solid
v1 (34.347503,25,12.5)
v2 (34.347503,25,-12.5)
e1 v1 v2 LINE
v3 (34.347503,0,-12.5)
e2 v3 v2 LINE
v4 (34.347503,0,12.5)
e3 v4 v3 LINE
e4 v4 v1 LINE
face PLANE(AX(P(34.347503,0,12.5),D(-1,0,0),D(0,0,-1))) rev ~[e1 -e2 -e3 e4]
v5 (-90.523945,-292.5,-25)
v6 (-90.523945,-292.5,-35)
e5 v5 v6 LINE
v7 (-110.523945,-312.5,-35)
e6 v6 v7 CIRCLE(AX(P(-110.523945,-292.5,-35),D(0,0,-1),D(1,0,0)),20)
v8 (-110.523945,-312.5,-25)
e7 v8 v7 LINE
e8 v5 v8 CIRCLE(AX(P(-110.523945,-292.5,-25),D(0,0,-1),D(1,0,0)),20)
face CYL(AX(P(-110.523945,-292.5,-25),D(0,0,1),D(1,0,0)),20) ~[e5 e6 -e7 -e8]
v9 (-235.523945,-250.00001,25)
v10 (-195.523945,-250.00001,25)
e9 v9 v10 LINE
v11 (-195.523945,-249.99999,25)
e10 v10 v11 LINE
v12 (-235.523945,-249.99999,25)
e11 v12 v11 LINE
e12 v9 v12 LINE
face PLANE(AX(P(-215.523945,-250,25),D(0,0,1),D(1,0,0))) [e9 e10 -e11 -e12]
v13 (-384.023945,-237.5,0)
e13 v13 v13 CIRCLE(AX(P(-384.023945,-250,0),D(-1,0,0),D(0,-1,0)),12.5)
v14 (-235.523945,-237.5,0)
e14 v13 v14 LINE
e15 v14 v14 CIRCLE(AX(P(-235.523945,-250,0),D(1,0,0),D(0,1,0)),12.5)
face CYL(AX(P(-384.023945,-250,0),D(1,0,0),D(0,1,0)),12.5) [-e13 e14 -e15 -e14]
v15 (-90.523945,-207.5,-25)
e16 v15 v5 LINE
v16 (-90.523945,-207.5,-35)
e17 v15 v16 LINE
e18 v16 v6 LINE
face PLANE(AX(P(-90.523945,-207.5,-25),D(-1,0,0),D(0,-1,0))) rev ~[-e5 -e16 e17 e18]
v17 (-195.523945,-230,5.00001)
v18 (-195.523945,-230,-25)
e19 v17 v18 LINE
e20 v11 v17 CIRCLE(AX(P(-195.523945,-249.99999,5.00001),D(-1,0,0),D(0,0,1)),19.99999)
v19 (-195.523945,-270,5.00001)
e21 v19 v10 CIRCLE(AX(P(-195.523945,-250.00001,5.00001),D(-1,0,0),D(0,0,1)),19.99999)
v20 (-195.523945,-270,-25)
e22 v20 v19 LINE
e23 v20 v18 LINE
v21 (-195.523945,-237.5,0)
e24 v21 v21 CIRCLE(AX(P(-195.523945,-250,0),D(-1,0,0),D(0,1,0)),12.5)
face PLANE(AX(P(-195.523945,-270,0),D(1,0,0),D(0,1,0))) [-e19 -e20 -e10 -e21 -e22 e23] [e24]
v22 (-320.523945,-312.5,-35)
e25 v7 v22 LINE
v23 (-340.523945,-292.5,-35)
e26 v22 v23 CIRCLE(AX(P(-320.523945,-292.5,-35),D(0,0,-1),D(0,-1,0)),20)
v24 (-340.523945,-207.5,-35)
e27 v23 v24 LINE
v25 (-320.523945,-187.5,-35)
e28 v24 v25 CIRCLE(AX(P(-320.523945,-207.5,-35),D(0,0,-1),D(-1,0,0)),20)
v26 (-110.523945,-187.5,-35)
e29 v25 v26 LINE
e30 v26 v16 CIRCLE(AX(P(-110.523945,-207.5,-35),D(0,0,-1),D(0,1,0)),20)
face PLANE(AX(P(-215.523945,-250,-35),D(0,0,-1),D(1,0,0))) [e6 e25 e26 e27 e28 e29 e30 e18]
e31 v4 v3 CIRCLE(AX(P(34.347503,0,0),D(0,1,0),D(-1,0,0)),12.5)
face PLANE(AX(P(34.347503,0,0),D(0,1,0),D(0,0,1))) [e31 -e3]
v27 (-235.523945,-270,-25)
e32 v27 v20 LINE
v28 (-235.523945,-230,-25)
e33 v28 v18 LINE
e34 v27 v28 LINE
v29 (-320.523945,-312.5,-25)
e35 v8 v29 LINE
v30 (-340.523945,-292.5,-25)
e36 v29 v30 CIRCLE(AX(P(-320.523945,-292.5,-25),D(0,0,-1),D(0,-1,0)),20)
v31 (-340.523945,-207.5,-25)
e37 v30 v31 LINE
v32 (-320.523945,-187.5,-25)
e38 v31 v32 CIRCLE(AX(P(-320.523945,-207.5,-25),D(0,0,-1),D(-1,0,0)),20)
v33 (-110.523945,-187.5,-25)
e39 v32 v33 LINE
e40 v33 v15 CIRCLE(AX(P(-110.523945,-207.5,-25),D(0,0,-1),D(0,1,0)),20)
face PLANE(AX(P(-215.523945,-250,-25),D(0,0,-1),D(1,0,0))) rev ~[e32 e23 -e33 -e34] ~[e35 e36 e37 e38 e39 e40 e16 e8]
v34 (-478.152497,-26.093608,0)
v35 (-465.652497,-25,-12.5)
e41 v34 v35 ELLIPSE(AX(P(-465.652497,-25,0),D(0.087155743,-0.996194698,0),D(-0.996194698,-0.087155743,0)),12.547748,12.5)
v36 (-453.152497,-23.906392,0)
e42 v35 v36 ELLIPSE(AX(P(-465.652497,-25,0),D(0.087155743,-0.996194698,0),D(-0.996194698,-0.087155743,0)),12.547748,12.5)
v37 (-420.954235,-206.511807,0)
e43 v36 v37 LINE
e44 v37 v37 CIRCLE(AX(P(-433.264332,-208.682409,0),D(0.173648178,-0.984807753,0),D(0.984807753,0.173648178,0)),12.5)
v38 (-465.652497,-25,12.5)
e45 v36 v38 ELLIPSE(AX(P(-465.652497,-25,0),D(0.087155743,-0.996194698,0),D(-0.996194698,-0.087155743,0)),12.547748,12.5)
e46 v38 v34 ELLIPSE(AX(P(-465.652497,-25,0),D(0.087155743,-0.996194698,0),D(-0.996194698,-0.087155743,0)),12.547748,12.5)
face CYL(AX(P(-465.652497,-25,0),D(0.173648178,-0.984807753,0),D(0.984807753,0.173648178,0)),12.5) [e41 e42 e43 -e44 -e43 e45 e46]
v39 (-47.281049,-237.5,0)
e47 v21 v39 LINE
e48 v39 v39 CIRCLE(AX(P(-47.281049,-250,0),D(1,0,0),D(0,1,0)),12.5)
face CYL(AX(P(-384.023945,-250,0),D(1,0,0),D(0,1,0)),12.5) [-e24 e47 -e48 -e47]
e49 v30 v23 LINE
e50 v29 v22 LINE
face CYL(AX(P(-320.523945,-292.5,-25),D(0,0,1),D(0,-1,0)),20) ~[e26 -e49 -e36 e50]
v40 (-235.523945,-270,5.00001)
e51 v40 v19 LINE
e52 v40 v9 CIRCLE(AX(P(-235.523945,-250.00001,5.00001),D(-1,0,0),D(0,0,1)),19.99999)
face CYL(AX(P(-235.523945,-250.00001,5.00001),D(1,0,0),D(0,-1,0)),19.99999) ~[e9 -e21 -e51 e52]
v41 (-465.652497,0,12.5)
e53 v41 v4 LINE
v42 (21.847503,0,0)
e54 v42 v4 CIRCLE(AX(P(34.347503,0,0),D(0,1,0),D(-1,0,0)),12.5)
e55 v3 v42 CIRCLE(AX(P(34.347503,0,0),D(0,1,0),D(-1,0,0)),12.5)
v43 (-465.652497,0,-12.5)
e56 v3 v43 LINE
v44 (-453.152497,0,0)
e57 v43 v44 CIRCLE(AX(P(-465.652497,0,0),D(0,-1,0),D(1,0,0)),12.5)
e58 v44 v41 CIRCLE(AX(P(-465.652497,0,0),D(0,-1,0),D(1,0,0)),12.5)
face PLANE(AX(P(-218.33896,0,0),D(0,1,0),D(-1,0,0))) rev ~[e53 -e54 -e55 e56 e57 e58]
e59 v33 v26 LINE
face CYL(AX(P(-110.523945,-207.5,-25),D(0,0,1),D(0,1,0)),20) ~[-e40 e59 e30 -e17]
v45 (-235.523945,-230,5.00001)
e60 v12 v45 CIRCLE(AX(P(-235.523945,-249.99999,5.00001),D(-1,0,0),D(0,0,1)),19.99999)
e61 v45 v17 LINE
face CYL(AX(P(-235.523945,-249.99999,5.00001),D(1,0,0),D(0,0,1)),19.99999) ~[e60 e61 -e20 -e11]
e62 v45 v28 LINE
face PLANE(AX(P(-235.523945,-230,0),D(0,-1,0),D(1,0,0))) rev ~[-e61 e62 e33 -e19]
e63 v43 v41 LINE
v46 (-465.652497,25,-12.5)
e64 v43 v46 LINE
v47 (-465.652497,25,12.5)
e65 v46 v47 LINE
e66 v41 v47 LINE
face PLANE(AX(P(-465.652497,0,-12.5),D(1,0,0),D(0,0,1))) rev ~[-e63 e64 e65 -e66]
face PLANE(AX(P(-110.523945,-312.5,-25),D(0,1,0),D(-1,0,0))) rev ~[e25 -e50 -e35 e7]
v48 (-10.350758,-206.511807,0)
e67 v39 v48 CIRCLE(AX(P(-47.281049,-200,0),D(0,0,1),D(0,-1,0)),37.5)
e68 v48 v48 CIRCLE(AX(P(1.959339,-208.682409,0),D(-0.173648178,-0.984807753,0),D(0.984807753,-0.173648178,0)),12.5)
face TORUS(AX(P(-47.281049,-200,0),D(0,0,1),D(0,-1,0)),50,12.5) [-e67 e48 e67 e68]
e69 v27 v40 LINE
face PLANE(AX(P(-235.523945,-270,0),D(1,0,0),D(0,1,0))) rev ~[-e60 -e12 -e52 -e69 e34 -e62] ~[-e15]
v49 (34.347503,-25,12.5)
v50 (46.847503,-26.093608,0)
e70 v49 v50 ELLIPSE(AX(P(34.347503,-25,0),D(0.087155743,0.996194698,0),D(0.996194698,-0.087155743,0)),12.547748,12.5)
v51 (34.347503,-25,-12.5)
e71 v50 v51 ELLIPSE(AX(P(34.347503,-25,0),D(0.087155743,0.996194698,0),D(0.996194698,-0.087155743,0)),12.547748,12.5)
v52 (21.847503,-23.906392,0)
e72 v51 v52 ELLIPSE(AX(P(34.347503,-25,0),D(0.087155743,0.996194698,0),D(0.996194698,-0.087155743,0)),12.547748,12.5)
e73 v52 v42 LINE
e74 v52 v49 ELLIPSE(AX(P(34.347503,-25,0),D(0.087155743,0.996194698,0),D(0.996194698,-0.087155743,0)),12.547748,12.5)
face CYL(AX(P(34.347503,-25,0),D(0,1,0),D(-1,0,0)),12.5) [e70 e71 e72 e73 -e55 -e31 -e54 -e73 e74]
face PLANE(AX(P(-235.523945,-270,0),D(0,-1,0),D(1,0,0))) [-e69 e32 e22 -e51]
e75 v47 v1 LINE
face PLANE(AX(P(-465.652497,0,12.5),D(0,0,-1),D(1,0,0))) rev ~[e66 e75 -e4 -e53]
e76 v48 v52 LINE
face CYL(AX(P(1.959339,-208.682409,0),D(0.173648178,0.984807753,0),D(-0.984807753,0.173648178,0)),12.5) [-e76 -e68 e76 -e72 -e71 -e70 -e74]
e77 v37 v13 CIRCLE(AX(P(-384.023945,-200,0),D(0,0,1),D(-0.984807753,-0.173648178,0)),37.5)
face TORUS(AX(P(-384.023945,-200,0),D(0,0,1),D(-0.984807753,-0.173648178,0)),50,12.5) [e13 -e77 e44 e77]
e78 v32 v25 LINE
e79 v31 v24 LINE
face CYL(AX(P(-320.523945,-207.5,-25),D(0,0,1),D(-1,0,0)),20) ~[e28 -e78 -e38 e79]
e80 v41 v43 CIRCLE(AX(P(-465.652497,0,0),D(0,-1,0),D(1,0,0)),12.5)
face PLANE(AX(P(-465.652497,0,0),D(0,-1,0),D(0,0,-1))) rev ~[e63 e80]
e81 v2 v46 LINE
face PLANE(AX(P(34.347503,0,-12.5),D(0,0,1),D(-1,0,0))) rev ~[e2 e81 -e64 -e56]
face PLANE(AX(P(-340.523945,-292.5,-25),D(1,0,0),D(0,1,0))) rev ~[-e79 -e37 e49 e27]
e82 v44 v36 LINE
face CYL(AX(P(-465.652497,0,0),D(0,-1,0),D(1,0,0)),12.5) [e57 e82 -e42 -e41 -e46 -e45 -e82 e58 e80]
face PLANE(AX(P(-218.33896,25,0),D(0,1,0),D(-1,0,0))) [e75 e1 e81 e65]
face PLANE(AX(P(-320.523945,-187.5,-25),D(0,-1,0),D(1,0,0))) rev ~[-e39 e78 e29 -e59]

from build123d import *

# Parameters (mm, degrees)
F0_R          = 12.5
F4_DEPTH      = 25
F5_W          = 40
F5_H          = 40
F6_DEPTH      = 25
F6_DEPTH_BACK = 25
F7_R          = 19.99999
F9_DEPTH      = 10


# Not quite as in the source:
# - a fillet or chamfer is up to 0.001 mm smaller than in the source, because OpenCascade refuses the exact size


with BuildPart() as f2:
    # F2: sweep along a path in F1
    with BuildLine(Plane.XY) as f2_path:
        Line((-465.6524967789, 0), (-465.6524967789, -25))
        Line((-465.6524967789, -25), (-433.2643322113, -208.6824088833))
        ThreePointArc((-433.2643322113, -208.6824088833), (-416.163325045, -238.3022221559), (-384.0239445606, -250))
        Line((-384.0239445606, -250), (-47.2810489972, -250))
        ThreePointArc((-47.2810489972, -250), (-15.1416685129, -238.3022221559), (1.9593386534, -208.6824088833))
        Line((1.9593386534, -208.6824088833), (34.3475032211, -25))
        Line((34.3475032211, -25), (34.3475032211, 0))
    # F0 (on Front) → F2 (sweep)
    with BuildSketch(Plane.XZ):
        with Locations((-465.6524967789, 0)):
            Circle(F0_R)
    sweep(path=f2_path.line, transition=Transition.RIGHT)

    # F3 (on face) → F4 (join)
    with BuildSketch(Plane(origin=(0, 0, 0), x_dir=(-1, 0, 0), z_dir=(0, 1, 0))):
        with BuildLine():
            Line((465.6524967789, 12.5), (-34.3475032211, 12.5))
            Line((-34.3475032211, 12.5), (-34.3475032211, -12.5))
            Line((-34.3475032211, -12.5), (465.6524967789, -12.5))
            ThreePointArc((465.6524967789, -12.5), (453.1524967789, 0), (465.6524967789, 12.5))
        make_face()
        with BuildLine():
            Line((465.6524967789, -12.5), (465.6524967789, 12.5))
            ThreePointArc((465.6524967789, 12.5), (453.1524967789, 0), (465.6524967789, -12.5))
        make_face()
    extrude(amount=F4_DEPTH)

    # F5 (on Top) → F6 (join, two sides)
    with BuildSketch(Plane.XY) as f6_sk:
        with Locations((-215.5239445606, -250)):
            Rectangle(F5_W, F5_H)
    extrude(amount=F6_DEPTH)
    extrude(f6_sk.sketch, amount=-F6_DEPTH_BACK)

    # F7 (radius 20 in the source; OpenCascade refuses exactly that, so slightly less here)
    f7_edges = [f2.edges().sort_by_distance(p)[0] for p in [
        (-215.523945, -230, 25),
        (-215.523945, -270, 25),
    ]]
    fillet(f7_edges, radius=F7_R)

    # F8 (on face) → F9 (join)
    with BuildSketch(Plane(origin=(0, 0, -25), x_dir=(1, 0, 0), z_dir=(0, 0, -1))):
        with BuildLine():
            Line((-110.5239445606, 312.5), (-320.5239445606, 312.5))
            ThreePointArc((-320.5239445606, 312.5), (-334.6660801844, 306.6421356237), (-340.5239445606, 292.5))
            Line((-340.5239445606, 292.5), (-340.5239445606, 207.5))
            ThreePointArc((-340.5239445606, 207.5), (-334.6660801844, 193.3578643763), (-320.5239445606, 187.5))
            Line((-320.5239445606, 187.5), (-110.5239445606, 187.5))
            ThreePointArc((-110.5239445606, 187.5), (-96.3818089369, 193.3578643763), (-90.5239445606, 207.5))
            Line((-90.5239445606, 207.5), (-90.5239445606, 292.5))
            ThreePointArc((-90.5239445606, 292.5), (-96.3818089369, 306.6421356237), (-110.5239445606, 312.5))
        make_face()
    extrude(amount=F9_DEPTH)


solid = f2.part
